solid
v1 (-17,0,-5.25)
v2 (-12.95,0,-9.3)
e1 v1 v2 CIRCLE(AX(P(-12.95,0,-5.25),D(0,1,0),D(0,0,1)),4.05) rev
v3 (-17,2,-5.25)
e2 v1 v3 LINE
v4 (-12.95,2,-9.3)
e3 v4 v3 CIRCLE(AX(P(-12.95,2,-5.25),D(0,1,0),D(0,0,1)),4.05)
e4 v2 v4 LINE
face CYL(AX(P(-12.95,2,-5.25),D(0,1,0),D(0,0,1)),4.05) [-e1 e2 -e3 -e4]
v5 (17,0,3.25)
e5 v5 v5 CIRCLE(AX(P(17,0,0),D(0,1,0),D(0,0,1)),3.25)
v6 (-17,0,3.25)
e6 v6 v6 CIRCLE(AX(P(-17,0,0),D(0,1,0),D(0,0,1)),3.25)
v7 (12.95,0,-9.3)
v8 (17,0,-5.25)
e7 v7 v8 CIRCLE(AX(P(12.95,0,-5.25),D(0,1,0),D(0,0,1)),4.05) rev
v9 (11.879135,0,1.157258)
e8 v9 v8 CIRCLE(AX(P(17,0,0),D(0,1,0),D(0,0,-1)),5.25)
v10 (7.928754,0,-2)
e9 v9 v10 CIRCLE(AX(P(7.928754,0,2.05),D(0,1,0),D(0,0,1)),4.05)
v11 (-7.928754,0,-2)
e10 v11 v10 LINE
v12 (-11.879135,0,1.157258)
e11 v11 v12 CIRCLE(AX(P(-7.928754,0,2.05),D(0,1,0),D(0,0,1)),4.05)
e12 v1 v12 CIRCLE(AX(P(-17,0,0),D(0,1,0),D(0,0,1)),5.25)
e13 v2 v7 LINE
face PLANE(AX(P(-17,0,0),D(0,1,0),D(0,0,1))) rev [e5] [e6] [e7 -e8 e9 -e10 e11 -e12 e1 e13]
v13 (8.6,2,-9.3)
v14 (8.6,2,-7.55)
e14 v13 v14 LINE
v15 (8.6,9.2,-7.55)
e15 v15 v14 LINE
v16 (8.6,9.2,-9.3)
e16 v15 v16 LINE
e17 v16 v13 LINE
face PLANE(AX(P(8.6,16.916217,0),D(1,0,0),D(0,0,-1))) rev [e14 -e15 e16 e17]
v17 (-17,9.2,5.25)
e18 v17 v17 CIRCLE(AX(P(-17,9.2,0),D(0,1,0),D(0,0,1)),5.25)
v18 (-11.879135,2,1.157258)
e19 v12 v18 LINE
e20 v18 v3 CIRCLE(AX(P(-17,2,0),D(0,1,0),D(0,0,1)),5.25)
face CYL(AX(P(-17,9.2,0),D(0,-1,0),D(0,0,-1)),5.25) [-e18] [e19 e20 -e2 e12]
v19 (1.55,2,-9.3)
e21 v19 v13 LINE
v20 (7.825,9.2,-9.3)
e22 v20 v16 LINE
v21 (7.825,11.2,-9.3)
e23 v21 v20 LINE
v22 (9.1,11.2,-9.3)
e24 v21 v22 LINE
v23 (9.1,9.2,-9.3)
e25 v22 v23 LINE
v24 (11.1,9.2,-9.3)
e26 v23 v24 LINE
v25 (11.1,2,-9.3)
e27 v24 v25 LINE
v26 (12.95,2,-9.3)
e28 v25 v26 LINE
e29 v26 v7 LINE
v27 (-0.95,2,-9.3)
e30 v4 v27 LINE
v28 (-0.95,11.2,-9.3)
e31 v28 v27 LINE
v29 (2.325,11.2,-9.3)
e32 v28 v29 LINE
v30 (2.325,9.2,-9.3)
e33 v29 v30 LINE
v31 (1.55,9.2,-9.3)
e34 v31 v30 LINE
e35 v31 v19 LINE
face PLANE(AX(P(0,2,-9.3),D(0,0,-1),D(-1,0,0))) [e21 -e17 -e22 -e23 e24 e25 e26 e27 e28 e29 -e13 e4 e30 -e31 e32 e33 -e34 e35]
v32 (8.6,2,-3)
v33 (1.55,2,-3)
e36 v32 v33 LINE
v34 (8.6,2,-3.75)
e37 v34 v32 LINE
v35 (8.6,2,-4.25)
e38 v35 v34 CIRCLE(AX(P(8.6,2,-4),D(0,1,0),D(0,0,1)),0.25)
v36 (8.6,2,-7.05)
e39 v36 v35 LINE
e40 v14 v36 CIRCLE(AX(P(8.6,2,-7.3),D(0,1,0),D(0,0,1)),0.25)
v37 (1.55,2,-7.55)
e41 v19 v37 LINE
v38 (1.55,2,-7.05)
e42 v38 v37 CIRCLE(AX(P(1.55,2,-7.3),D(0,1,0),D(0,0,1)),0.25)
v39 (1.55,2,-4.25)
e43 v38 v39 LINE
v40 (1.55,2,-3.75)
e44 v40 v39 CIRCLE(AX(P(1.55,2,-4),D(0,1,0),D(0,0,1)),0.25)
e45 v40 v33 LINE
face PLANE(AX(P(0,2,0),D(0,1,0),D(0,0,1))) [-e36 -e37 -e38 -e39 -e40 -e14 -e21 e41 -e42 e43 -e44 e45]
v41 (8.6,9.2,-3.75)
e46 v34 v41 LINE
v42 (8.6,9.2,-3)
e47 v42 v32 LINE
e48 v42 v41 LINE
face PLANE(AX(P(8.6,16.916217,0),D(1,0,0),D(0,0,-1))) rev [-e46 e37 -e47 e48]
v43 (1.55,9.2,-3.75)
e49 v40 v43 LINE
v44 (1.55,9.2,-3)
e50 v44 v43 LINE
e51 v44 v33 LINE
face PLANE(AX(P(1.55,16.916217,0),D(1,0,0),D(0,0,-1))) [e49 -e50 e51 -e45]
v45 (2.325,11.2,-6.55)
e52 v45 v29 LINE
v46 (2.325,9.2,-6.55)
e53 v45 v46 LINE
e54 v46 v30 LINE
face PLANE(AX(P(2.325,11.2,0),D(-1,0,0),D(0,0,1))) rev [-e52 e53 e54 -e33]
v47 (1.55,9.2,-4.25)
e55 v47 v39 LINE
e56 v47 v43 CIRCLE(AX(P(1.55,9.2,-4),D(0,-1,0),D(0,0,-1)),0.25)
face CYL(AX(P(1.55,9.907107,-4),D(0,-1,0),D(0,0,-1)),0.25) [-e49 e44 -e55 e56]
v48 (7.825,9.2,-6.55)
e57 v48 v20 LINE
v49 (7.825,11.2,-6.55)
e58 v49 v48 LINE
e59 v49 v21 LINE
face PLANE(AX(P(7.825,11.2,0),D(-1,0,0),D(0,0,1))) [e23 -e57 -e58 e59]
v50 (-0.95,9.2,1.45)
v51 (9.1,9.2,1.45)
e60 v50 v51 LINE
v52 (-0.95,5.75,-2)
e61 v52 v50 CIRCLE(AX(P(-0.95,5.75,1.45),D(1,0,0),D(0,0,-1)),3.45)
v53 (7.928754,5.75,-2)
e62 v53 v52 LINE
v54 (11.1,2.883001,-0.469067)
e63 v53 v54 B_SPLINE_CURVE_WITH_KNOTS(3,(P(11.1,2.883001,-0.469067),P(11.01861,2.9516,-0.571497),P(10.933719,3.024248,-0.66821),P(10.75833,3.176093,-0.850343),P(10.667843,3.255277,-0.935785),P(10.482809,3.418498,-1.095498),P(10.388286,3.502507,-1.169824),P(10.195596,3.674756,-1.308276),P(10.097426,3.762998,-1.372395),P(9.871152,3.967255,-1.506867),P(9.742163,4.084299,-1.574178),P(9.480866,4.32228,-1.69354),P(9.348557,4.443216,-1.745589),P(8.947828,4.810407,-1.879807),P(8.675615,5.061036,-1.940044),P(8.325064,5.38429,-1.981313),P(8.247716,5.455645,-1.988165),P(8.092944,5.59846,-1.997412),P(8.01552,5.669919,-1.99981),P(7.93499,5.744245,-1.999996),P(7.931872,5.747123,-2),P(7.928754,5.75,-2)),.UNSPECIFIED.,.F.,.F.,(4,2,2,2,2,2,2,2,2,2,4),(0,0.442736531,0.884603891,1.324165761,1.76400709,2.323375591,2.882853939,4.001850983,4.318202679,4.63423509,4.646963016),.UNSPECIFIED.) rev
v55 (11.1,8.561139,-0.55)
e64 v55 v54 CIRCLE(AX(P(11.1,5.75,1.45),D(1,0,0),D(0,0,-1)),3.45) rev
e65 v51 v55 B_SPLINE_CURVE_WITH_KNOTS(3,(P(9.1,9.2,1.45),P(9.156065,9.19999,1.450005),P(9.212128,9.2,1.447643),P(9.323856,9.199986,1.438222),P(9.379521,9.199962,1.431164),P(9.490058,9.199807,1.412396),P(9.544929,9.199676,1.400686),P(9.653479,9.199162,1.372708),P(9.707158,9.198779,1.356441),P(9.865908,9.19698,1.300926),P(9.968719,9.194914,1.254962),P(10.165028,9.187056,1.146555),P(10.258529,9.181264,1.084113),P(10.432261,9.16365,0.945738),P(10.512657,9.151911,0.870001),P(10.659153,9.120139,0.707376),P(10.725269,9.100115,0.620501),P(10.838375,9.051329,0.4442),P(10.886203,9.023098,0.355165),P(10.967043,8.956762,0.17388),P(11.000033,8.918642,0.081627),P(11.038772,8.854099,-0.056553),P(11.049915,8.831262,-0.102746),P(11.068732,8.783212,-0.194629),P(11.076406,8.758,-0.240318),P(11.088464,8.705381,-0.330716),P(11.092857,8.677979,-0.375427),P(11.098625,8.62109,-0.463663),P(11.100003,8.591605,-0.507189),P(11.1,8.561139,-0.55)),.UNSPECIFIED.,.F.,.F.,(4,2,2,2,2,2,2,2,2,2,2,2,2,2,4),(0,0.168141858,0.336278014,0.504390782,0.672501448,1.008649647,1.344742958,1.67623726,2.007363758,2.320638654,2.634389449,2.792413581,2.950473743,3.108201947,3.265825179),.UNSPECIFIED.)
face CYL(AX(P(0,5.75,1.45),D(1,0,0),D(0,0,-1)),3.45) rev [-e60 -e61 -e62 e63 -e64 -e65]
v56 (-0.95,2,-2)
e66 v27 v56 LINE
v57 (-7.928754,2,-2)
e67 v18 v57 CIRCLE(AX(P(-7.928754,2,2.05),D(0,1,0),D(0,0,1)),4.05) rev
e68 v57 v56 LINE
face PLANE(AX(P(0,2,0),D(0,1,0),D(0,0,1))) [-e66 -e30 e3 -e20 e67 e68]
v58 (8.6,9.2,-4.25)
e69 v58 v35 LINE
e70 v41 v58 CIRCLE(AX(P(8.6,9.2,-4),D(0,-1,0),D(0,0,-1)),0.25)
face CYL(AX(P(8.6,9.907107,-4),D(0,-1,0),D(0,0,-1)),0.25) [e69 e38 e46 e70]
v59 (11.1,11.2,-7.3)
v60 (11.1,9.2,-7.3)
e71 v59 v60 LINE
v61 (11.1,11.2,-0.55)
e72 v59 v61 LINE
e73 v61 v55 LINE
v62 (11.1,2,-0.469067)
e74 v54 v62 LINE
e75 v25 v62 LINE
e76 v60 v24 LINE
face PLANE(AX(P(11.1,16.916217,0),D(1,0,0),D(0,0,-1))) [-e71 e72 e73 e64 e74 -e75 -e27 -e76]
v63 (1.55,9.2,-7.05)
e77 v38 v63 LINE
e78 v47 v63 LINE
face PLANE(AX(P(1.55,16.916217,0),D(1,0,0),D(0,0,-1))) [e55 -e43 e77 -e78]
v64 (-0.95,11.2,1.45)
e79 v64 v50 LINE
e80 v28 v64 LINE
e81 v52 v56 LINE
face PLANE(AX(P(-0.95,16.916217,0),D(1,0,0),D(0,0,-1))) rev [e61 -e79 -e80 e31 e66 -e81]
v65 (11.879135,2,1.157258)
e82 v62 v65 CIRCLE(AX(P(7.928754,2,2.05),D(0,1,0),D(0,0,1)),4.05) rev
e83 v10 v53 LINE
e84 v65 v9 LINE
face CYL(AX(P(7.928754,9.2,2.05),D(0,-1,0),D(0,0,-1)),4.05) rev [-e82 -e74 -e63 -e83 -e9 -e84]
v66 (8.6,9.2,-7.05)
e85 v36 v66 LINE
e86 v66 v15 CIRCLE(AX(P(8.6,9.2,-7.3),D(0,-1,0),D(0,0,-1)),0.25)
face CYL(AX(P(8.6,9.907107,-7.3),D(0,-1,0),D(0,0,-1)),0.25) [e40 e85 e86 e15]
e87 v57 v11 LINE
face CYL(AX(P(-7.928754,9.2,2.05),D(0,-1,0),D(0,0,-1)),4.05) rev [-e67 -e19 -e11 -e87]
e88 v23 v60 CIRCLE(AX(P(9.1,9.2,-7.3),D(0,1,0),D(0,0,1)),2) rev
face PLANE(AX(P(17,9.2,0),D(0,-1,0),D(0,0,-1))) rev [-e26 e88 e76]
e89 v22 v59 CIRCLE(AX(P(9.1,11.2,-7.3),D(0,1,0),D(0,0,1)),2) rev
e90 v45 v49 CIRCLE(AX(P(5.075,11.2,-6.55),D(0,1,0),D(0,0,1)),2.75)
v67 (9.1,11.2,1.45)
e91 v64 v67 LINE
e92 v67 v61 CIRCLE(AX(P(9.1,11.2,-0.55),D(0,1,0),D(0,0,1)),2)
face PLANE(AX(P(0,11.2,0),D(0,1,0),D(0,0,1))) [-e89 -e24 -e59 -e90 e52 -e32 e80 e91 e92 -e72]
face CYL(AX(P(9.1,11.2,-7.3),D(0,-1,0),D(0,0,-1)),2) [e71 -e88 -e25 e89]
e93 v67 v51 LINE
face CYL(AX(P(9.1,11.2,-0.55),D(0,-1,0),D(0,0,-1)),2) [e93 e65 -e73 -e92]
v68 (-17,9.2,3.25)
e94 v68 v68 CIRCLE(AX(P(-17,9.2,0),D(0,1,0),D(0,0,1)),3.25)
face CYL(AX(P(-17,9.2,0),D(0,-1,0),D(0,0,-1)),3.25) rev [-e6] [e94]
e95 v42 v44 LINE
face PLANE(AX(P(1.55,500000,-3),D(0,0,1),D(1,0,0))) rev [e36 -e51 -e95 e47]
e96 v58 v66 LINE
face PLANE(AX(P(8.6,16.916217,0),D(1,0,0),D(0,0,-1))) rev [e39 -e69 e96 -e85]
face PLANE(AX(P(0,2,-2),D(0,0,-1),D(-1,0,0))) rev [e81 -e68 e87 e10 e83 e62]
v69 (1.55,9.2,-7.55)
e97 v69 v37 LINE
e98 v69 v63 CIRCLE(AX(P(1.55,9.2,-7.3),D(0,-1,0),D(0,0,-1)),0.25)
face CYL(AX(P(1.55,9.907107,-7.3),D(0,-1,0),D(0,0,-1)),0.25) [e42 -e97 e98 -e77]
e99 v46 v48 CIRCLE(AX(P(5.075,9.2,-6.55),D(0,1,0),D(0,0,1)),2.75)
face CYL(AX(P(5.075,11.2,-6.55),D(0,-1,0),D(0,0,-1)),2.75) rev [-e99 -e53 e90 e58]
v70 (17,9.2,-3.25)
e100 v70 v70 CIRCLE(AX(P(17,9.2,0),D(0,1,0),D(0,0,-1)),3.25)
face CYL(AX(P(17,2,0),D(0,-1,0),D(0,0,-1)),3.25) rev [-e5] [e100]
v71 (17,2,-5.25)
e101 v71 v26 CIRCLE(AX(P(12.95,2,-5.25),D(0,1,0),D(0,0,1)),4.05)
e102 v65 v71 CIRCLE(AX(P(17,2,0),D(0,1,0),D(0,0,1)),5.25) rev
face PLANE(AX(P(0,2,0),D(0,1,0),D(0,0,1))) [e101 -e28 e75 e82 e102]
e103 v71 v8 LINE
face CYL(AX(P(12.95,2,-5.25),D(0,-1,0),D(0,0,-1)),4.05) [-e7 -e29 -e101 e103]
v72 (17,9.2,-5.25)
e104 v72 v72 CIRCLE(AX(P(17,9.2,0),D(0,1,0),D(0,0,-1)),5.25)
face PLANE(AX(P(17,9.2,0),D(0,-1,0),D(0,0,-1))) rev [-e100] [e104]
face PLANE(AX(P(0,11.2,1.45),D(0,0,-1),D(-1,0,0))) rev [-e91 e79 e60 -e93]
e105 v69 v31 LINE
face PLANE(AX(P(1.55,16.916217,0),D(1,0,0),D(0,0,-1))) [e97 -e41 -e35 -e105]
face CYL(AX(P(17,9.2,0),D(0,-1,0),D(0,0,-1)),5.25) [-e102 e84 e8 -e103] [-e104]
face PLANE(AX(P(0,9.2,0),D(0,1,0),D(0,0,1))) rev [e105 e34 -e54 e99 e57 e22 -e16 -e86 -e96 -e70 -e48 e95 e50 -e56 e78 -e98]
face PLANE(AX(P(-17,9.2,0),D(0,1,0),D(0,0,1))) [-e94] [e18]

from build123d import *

# Parameters (mm, degrees)
SKETCH1_R             = 5.25
SKETCH1_R_2           = 3.25
BOSS_EXTRUDE1_DEPTH   = 9.2
BOSS_EXTRUDE1_2_DEPTH = 9.2
BOSS_EXTRUDE2_DEPTH   = 2
SKETCH3_W             = 2.5
SKETCH3_H             = 7.3
BOSS_EXTRUDE3_DEPTH   = 7.2
BOSS_EXTRUDE4_DEPTH   = 2
SKETCH6_R             = 0.25
BOSS_EXTRUDE5_DEPTH   = 7.2
BOSS_EXTRUDE6_REACH   = 27.811
SKETCH7_W             = 7.05
SKETCH7_H             = 1
FILLET3_R             = 3.45
FILLET4_DEPTH         = 2
FILLET4_2_DEPTH       = 2
FILLET4_START         = 2
FILLET4_3_DEPTH       = 0.883001
FILLET4_START_2       = 7.928754
FILLET4_4_DEPTH       = 3.171246
FILLET4_START_3       = 2.883001
FILLET4_5_DEPTH       = 2.866999


with BuildPart() as part:
    # Sketch1 → Boss-Extrude1 (new body)
    with BuildSketch(Plane(origin=(0, 0, 0), x_dir=(1, 0, 0), z_dir=(0, 1, 0))):
        with Locations(Location((-17, 0, 0), (0, 0, 270))):
            Circle(SKETCH1_R)
        with Locations(Location((-17, 0, 0), (0, 0, 270))):
            Circle(SKETCH1_R_2, mode=Mode.SUBTRACT)
    extrude(amount=BOSS_EXTRUDE1_DEPTH)



with BuildPart() as body_2:
    # Sketch1 → Boss-Extrude1 2 (new body)
    with BuildSketch(Plane(origin=(0, 0, 0), x_dir=(1, 0, 0), z_dir=(0, 1, 0))):
        with Locations(Location((17, 0, 0), (0, 0, 90))):
            Circle(SKETCH1_R)
        with Locations(Location((17, 0, 0), (0, 0, 90))):
            Circle(SKETCH1_R_2, mode=Mode.SUBTRACT)
    extrude(amount=BOSS_EXTRUDE1_2_DEPTH)


with BuildPart() as part_1:
    add(part.part)

    add(body_2.part)  # Boss-Extrude2 merges body 2
    # Sketch2 → Boss-Extrude2 (add)
    with BuildSketch(Plane(origin=(0, 0, 0), x_dir=(1, 0, 0), z_dir=(0, 1, 0))):
        with BuildLine():
            Line((17, 9.3), (-17, 9.3))
            Line((-17, 9.3), (-17, 3.25))
            ThreePointArc((-17, 3.25), (-15.574781, 2.92083), (-14.438262, 2))
            Line((-14.438262, 2), (14.438262, 2))
            ThreePointArc((14.438262, 2), (15.574781, 2.92083), (17, 3.25))
            Line((17, 3.25), (17, 9.3))
        make_face()
    extrude(amount=BOSS_EXTRUDE2_DEPTH)

    # Sketch3 → Boss-Extrude3 (add)
    with BuildSketch(Plane(origin=(0, 2, 0), x_dir=(1, 0, 0), z_dir=(0, 1, 0))):
        with Locations((0.3, 5.65)):
            Rectangle(SKETCH3_W, SKETCH3_H)
        with Locations((9.85, 5.65)):
            Rectangle(SKETCH3_W, SKETCH3_H)
    extrude(amount=BOSS_EXTRUDE3_DEPTH)

    # Sketch5 → Boss-Extrude4 (add)
    with BuildSketch(Plane(origin=(0, 9.2, 0), x_dir=(1, 0, 0), z_dir=(0, 1, 0))):
        with BuildLine():
            Line((1.55, 9.3), (-0.95, 9.3))
            Line((-0.95, 9.3), (-0.95, -1.45))
            Line((-0.95, -1.45), (9.1, -1.45))
            ThreePointArc((9.1, -1.45), (10.514214, -0.864214), (11.1, 0.55))
            Line((11.1, 0.55), (11.1, 2))
            Line((11.1, 2), (8.6, 2))
            Line((8.6, 2), (1.55, 2))
            Line((1.55, 2), (1.55, 9.3))
        make_face()
        with BuildLine():
            Line((8.6, 9.3), (8.6, 2))
            Line((8.6, 2), (11.1, 2))
            Line((11.1, 2), (11.1, 7.3))
            ThreePointArc((11.1, 7.3), (10.514214, 8.714214), (9.1, 9.3))
            Line((9.1, 9.3), (8.6, 9.3))
        make_face()
        with BuildLine():
            Line((2.325, 9.3), (1.55, 9.3))
            Line((1.55, 9.3), (1.55, 2))
            Line((1.55, 2), (8.6, 2))
            Line((8.6, 2), (8.6, 9.3))
            Line((8.6, 9.3), (7.825, 9.3))
            Line((7.825, 9.3), (7.825, 6.55))
            ThreePointArc((7.825, 6.55), (5.075, 3.8), (2.325, 6.55))
            Line((2.325, 6.55), (2.325, 9.3))
        make_face()
    extrude(amount=BOSS_EXTRUDE4_DEPTH)

    # Sketch6 → Boss-Extrude5 (add)
    with BuildSketch(Plane(origin=(0, 2, 0), x_dir=(1, 0, 0), z_dir=(0, 1, 0))):
        with Locations((1.55, 7.3)):
            Circle(SKETCH6_R)
        with Locations((1.55, 4)):
            Circle(SKETCH6_R)
        with Locations((8.6, 7.3)):
            Circle(SKETCH6_R)
        with Locations((8.6, 4)):
            Circle(SKETCH6_R)
    extrude(amount=BOSS_EXTRUDE5_DEPTH)

    # Sketch7 → Boss-Extrude6 (add, up to next)
    with BuildSketch(Plane(origin=(0, 2, 0), x_dir=(1, 0, 0), z_dir=(0, 1, 0)), mode=Mode.PRIVATE) as boss_extrude6_sk1:
        with Locations((5.075, 2.5)):
            Rectangle(SKETCH7_W, SKETCH7_H)
    boss_extrude6_tool1 = extrude(boss_extrude6_sk1.sketch, amount=BOSS_EXTRUDE6_REACH, mode=Mode.PRIVATE) - part_1.part
    add(boss_extrude6_tool1.solids().sort_by_distance((5.075, 2, -2.5))[0])

    # Fillet3
    fillet3_edges = [part_1.edges().sort_by_distance(p)[0] for p in [
        (5.075, 9.2, -2),
    ]]
    fillet(fillet3_edges, radius=FILLET3_R - 0.0001)  # a hair under: the kernel refuses the full size

    # Fillet4: read off the stored shape, not the designer's step
    # Fillet4 outline → Fillet4 (cut)
    with BuildSketch(Plane(origin=(0, 0, 0), x_dir=(1, 0, 0), z_dir=(0, 1, 0))):
        with BuildLine():
            ThreePointArc((12.95, 9.3), (15.813782, 8.113782), (17, 5.25))
            Line((17, 5.25), (17, 9.3))
            Line((17, 9.3), (12.95, 9.3))
        make_face()
        with BuildLine():
            ThreePointArc((-17, 5.25), (-15.813782, 8.113782), (-12.95, 9.3))
            Line((-12.95, 9.3), (-17, 9.3))
            Line((-17, 9.3), (-17, 5.25))
        make_face()
    extrude(amount=FILLET4_DEPTH, mode=Mode.SUBTRACT)

    # Fillet4 2 outline → Fillet4 2 (add)
    with BuildSketch(Plane(origin=(0, 0, 0), x_dir=(1, 0, 0), z_dir=(0, 1, 0))):
        with BuildLine():
            ThreePointArc((7.928754, 2), (10.457281, 1.113709), (11.879135, -1.157258))
            ThreePointArc((11.879135, -1.157258), (11.768637, 0.441974), (12.145878, 2))
            Line((12.145878, 2), (7.928754, 2))
        make_face()
        with BuildLine():
            ThreePointArc((-11.879135, -1.157258), (-10.457281, 1.113709), (-7.928754, 2))
            Line((-7.928754, 2), (-12.145878, 2))
            ThreePointArc((-12.145878, 2), (-11.768637, 0.441974), (-11.879135, -1.157258))
        make_face()
    extrude(amount=FILLET4_2_DEPTH)

    # Fillet4 3 outline → Fillet4 3 (add)
    with BuildSketch(Plane(origin=(0, 0, 0), x_dir=(1, 0, 0), z_dir=(0, 1, 0)).offset(FILLET4_START)):
        with BuildLine():
            ThreePointArc((7.928754, 2), (9.689475, 1.59724), (11.1, 0.469067))
            Line((11.1, 0.469067), (11.1, 2))
            Line((11.1, 2), (7.928754, 2))
        make_face()
    extrude(amount=FILLET4_3_DEPTH)

    # Fillet4 4 outline → Fillet4 4 (add)
    with BuildSketch(Plane.YZ.offset(FILLET4_START_2)):
        with BuildLine():
            ThreePointArc((5.75, -2), (4.124928, -1.593294), (2.883001, -0.469067))
            Line((2.883001, -0.469067), (2.883001, -2))
            Line((2.883001, -2), (5.75, -2))
        make_face()
    extrude(amount=FILLET4_4_DEPTH)

    # Fillet4 5 outline → Fillet4 5 (cut)
    with BuildSketch(Plane(origin=(0, 0, 0), x_dir=(1, 0, 0), z_dir=(0, 1, 0)).offset(FILLET4_START_3)):
        with BuildLine():
            ThreePointArc((11.840276, -1), (10.393506, 1.163643), (7.928754, 2))
            Line((7.928754, 2), (7.928754, -1))
            Line((7.928754, -1), (11.840276, -1))
        make_face()
    extrude(amount=FILLET4_5_DEPTH, mode=Mode.SUBTRACT)


solid = part_1.part
